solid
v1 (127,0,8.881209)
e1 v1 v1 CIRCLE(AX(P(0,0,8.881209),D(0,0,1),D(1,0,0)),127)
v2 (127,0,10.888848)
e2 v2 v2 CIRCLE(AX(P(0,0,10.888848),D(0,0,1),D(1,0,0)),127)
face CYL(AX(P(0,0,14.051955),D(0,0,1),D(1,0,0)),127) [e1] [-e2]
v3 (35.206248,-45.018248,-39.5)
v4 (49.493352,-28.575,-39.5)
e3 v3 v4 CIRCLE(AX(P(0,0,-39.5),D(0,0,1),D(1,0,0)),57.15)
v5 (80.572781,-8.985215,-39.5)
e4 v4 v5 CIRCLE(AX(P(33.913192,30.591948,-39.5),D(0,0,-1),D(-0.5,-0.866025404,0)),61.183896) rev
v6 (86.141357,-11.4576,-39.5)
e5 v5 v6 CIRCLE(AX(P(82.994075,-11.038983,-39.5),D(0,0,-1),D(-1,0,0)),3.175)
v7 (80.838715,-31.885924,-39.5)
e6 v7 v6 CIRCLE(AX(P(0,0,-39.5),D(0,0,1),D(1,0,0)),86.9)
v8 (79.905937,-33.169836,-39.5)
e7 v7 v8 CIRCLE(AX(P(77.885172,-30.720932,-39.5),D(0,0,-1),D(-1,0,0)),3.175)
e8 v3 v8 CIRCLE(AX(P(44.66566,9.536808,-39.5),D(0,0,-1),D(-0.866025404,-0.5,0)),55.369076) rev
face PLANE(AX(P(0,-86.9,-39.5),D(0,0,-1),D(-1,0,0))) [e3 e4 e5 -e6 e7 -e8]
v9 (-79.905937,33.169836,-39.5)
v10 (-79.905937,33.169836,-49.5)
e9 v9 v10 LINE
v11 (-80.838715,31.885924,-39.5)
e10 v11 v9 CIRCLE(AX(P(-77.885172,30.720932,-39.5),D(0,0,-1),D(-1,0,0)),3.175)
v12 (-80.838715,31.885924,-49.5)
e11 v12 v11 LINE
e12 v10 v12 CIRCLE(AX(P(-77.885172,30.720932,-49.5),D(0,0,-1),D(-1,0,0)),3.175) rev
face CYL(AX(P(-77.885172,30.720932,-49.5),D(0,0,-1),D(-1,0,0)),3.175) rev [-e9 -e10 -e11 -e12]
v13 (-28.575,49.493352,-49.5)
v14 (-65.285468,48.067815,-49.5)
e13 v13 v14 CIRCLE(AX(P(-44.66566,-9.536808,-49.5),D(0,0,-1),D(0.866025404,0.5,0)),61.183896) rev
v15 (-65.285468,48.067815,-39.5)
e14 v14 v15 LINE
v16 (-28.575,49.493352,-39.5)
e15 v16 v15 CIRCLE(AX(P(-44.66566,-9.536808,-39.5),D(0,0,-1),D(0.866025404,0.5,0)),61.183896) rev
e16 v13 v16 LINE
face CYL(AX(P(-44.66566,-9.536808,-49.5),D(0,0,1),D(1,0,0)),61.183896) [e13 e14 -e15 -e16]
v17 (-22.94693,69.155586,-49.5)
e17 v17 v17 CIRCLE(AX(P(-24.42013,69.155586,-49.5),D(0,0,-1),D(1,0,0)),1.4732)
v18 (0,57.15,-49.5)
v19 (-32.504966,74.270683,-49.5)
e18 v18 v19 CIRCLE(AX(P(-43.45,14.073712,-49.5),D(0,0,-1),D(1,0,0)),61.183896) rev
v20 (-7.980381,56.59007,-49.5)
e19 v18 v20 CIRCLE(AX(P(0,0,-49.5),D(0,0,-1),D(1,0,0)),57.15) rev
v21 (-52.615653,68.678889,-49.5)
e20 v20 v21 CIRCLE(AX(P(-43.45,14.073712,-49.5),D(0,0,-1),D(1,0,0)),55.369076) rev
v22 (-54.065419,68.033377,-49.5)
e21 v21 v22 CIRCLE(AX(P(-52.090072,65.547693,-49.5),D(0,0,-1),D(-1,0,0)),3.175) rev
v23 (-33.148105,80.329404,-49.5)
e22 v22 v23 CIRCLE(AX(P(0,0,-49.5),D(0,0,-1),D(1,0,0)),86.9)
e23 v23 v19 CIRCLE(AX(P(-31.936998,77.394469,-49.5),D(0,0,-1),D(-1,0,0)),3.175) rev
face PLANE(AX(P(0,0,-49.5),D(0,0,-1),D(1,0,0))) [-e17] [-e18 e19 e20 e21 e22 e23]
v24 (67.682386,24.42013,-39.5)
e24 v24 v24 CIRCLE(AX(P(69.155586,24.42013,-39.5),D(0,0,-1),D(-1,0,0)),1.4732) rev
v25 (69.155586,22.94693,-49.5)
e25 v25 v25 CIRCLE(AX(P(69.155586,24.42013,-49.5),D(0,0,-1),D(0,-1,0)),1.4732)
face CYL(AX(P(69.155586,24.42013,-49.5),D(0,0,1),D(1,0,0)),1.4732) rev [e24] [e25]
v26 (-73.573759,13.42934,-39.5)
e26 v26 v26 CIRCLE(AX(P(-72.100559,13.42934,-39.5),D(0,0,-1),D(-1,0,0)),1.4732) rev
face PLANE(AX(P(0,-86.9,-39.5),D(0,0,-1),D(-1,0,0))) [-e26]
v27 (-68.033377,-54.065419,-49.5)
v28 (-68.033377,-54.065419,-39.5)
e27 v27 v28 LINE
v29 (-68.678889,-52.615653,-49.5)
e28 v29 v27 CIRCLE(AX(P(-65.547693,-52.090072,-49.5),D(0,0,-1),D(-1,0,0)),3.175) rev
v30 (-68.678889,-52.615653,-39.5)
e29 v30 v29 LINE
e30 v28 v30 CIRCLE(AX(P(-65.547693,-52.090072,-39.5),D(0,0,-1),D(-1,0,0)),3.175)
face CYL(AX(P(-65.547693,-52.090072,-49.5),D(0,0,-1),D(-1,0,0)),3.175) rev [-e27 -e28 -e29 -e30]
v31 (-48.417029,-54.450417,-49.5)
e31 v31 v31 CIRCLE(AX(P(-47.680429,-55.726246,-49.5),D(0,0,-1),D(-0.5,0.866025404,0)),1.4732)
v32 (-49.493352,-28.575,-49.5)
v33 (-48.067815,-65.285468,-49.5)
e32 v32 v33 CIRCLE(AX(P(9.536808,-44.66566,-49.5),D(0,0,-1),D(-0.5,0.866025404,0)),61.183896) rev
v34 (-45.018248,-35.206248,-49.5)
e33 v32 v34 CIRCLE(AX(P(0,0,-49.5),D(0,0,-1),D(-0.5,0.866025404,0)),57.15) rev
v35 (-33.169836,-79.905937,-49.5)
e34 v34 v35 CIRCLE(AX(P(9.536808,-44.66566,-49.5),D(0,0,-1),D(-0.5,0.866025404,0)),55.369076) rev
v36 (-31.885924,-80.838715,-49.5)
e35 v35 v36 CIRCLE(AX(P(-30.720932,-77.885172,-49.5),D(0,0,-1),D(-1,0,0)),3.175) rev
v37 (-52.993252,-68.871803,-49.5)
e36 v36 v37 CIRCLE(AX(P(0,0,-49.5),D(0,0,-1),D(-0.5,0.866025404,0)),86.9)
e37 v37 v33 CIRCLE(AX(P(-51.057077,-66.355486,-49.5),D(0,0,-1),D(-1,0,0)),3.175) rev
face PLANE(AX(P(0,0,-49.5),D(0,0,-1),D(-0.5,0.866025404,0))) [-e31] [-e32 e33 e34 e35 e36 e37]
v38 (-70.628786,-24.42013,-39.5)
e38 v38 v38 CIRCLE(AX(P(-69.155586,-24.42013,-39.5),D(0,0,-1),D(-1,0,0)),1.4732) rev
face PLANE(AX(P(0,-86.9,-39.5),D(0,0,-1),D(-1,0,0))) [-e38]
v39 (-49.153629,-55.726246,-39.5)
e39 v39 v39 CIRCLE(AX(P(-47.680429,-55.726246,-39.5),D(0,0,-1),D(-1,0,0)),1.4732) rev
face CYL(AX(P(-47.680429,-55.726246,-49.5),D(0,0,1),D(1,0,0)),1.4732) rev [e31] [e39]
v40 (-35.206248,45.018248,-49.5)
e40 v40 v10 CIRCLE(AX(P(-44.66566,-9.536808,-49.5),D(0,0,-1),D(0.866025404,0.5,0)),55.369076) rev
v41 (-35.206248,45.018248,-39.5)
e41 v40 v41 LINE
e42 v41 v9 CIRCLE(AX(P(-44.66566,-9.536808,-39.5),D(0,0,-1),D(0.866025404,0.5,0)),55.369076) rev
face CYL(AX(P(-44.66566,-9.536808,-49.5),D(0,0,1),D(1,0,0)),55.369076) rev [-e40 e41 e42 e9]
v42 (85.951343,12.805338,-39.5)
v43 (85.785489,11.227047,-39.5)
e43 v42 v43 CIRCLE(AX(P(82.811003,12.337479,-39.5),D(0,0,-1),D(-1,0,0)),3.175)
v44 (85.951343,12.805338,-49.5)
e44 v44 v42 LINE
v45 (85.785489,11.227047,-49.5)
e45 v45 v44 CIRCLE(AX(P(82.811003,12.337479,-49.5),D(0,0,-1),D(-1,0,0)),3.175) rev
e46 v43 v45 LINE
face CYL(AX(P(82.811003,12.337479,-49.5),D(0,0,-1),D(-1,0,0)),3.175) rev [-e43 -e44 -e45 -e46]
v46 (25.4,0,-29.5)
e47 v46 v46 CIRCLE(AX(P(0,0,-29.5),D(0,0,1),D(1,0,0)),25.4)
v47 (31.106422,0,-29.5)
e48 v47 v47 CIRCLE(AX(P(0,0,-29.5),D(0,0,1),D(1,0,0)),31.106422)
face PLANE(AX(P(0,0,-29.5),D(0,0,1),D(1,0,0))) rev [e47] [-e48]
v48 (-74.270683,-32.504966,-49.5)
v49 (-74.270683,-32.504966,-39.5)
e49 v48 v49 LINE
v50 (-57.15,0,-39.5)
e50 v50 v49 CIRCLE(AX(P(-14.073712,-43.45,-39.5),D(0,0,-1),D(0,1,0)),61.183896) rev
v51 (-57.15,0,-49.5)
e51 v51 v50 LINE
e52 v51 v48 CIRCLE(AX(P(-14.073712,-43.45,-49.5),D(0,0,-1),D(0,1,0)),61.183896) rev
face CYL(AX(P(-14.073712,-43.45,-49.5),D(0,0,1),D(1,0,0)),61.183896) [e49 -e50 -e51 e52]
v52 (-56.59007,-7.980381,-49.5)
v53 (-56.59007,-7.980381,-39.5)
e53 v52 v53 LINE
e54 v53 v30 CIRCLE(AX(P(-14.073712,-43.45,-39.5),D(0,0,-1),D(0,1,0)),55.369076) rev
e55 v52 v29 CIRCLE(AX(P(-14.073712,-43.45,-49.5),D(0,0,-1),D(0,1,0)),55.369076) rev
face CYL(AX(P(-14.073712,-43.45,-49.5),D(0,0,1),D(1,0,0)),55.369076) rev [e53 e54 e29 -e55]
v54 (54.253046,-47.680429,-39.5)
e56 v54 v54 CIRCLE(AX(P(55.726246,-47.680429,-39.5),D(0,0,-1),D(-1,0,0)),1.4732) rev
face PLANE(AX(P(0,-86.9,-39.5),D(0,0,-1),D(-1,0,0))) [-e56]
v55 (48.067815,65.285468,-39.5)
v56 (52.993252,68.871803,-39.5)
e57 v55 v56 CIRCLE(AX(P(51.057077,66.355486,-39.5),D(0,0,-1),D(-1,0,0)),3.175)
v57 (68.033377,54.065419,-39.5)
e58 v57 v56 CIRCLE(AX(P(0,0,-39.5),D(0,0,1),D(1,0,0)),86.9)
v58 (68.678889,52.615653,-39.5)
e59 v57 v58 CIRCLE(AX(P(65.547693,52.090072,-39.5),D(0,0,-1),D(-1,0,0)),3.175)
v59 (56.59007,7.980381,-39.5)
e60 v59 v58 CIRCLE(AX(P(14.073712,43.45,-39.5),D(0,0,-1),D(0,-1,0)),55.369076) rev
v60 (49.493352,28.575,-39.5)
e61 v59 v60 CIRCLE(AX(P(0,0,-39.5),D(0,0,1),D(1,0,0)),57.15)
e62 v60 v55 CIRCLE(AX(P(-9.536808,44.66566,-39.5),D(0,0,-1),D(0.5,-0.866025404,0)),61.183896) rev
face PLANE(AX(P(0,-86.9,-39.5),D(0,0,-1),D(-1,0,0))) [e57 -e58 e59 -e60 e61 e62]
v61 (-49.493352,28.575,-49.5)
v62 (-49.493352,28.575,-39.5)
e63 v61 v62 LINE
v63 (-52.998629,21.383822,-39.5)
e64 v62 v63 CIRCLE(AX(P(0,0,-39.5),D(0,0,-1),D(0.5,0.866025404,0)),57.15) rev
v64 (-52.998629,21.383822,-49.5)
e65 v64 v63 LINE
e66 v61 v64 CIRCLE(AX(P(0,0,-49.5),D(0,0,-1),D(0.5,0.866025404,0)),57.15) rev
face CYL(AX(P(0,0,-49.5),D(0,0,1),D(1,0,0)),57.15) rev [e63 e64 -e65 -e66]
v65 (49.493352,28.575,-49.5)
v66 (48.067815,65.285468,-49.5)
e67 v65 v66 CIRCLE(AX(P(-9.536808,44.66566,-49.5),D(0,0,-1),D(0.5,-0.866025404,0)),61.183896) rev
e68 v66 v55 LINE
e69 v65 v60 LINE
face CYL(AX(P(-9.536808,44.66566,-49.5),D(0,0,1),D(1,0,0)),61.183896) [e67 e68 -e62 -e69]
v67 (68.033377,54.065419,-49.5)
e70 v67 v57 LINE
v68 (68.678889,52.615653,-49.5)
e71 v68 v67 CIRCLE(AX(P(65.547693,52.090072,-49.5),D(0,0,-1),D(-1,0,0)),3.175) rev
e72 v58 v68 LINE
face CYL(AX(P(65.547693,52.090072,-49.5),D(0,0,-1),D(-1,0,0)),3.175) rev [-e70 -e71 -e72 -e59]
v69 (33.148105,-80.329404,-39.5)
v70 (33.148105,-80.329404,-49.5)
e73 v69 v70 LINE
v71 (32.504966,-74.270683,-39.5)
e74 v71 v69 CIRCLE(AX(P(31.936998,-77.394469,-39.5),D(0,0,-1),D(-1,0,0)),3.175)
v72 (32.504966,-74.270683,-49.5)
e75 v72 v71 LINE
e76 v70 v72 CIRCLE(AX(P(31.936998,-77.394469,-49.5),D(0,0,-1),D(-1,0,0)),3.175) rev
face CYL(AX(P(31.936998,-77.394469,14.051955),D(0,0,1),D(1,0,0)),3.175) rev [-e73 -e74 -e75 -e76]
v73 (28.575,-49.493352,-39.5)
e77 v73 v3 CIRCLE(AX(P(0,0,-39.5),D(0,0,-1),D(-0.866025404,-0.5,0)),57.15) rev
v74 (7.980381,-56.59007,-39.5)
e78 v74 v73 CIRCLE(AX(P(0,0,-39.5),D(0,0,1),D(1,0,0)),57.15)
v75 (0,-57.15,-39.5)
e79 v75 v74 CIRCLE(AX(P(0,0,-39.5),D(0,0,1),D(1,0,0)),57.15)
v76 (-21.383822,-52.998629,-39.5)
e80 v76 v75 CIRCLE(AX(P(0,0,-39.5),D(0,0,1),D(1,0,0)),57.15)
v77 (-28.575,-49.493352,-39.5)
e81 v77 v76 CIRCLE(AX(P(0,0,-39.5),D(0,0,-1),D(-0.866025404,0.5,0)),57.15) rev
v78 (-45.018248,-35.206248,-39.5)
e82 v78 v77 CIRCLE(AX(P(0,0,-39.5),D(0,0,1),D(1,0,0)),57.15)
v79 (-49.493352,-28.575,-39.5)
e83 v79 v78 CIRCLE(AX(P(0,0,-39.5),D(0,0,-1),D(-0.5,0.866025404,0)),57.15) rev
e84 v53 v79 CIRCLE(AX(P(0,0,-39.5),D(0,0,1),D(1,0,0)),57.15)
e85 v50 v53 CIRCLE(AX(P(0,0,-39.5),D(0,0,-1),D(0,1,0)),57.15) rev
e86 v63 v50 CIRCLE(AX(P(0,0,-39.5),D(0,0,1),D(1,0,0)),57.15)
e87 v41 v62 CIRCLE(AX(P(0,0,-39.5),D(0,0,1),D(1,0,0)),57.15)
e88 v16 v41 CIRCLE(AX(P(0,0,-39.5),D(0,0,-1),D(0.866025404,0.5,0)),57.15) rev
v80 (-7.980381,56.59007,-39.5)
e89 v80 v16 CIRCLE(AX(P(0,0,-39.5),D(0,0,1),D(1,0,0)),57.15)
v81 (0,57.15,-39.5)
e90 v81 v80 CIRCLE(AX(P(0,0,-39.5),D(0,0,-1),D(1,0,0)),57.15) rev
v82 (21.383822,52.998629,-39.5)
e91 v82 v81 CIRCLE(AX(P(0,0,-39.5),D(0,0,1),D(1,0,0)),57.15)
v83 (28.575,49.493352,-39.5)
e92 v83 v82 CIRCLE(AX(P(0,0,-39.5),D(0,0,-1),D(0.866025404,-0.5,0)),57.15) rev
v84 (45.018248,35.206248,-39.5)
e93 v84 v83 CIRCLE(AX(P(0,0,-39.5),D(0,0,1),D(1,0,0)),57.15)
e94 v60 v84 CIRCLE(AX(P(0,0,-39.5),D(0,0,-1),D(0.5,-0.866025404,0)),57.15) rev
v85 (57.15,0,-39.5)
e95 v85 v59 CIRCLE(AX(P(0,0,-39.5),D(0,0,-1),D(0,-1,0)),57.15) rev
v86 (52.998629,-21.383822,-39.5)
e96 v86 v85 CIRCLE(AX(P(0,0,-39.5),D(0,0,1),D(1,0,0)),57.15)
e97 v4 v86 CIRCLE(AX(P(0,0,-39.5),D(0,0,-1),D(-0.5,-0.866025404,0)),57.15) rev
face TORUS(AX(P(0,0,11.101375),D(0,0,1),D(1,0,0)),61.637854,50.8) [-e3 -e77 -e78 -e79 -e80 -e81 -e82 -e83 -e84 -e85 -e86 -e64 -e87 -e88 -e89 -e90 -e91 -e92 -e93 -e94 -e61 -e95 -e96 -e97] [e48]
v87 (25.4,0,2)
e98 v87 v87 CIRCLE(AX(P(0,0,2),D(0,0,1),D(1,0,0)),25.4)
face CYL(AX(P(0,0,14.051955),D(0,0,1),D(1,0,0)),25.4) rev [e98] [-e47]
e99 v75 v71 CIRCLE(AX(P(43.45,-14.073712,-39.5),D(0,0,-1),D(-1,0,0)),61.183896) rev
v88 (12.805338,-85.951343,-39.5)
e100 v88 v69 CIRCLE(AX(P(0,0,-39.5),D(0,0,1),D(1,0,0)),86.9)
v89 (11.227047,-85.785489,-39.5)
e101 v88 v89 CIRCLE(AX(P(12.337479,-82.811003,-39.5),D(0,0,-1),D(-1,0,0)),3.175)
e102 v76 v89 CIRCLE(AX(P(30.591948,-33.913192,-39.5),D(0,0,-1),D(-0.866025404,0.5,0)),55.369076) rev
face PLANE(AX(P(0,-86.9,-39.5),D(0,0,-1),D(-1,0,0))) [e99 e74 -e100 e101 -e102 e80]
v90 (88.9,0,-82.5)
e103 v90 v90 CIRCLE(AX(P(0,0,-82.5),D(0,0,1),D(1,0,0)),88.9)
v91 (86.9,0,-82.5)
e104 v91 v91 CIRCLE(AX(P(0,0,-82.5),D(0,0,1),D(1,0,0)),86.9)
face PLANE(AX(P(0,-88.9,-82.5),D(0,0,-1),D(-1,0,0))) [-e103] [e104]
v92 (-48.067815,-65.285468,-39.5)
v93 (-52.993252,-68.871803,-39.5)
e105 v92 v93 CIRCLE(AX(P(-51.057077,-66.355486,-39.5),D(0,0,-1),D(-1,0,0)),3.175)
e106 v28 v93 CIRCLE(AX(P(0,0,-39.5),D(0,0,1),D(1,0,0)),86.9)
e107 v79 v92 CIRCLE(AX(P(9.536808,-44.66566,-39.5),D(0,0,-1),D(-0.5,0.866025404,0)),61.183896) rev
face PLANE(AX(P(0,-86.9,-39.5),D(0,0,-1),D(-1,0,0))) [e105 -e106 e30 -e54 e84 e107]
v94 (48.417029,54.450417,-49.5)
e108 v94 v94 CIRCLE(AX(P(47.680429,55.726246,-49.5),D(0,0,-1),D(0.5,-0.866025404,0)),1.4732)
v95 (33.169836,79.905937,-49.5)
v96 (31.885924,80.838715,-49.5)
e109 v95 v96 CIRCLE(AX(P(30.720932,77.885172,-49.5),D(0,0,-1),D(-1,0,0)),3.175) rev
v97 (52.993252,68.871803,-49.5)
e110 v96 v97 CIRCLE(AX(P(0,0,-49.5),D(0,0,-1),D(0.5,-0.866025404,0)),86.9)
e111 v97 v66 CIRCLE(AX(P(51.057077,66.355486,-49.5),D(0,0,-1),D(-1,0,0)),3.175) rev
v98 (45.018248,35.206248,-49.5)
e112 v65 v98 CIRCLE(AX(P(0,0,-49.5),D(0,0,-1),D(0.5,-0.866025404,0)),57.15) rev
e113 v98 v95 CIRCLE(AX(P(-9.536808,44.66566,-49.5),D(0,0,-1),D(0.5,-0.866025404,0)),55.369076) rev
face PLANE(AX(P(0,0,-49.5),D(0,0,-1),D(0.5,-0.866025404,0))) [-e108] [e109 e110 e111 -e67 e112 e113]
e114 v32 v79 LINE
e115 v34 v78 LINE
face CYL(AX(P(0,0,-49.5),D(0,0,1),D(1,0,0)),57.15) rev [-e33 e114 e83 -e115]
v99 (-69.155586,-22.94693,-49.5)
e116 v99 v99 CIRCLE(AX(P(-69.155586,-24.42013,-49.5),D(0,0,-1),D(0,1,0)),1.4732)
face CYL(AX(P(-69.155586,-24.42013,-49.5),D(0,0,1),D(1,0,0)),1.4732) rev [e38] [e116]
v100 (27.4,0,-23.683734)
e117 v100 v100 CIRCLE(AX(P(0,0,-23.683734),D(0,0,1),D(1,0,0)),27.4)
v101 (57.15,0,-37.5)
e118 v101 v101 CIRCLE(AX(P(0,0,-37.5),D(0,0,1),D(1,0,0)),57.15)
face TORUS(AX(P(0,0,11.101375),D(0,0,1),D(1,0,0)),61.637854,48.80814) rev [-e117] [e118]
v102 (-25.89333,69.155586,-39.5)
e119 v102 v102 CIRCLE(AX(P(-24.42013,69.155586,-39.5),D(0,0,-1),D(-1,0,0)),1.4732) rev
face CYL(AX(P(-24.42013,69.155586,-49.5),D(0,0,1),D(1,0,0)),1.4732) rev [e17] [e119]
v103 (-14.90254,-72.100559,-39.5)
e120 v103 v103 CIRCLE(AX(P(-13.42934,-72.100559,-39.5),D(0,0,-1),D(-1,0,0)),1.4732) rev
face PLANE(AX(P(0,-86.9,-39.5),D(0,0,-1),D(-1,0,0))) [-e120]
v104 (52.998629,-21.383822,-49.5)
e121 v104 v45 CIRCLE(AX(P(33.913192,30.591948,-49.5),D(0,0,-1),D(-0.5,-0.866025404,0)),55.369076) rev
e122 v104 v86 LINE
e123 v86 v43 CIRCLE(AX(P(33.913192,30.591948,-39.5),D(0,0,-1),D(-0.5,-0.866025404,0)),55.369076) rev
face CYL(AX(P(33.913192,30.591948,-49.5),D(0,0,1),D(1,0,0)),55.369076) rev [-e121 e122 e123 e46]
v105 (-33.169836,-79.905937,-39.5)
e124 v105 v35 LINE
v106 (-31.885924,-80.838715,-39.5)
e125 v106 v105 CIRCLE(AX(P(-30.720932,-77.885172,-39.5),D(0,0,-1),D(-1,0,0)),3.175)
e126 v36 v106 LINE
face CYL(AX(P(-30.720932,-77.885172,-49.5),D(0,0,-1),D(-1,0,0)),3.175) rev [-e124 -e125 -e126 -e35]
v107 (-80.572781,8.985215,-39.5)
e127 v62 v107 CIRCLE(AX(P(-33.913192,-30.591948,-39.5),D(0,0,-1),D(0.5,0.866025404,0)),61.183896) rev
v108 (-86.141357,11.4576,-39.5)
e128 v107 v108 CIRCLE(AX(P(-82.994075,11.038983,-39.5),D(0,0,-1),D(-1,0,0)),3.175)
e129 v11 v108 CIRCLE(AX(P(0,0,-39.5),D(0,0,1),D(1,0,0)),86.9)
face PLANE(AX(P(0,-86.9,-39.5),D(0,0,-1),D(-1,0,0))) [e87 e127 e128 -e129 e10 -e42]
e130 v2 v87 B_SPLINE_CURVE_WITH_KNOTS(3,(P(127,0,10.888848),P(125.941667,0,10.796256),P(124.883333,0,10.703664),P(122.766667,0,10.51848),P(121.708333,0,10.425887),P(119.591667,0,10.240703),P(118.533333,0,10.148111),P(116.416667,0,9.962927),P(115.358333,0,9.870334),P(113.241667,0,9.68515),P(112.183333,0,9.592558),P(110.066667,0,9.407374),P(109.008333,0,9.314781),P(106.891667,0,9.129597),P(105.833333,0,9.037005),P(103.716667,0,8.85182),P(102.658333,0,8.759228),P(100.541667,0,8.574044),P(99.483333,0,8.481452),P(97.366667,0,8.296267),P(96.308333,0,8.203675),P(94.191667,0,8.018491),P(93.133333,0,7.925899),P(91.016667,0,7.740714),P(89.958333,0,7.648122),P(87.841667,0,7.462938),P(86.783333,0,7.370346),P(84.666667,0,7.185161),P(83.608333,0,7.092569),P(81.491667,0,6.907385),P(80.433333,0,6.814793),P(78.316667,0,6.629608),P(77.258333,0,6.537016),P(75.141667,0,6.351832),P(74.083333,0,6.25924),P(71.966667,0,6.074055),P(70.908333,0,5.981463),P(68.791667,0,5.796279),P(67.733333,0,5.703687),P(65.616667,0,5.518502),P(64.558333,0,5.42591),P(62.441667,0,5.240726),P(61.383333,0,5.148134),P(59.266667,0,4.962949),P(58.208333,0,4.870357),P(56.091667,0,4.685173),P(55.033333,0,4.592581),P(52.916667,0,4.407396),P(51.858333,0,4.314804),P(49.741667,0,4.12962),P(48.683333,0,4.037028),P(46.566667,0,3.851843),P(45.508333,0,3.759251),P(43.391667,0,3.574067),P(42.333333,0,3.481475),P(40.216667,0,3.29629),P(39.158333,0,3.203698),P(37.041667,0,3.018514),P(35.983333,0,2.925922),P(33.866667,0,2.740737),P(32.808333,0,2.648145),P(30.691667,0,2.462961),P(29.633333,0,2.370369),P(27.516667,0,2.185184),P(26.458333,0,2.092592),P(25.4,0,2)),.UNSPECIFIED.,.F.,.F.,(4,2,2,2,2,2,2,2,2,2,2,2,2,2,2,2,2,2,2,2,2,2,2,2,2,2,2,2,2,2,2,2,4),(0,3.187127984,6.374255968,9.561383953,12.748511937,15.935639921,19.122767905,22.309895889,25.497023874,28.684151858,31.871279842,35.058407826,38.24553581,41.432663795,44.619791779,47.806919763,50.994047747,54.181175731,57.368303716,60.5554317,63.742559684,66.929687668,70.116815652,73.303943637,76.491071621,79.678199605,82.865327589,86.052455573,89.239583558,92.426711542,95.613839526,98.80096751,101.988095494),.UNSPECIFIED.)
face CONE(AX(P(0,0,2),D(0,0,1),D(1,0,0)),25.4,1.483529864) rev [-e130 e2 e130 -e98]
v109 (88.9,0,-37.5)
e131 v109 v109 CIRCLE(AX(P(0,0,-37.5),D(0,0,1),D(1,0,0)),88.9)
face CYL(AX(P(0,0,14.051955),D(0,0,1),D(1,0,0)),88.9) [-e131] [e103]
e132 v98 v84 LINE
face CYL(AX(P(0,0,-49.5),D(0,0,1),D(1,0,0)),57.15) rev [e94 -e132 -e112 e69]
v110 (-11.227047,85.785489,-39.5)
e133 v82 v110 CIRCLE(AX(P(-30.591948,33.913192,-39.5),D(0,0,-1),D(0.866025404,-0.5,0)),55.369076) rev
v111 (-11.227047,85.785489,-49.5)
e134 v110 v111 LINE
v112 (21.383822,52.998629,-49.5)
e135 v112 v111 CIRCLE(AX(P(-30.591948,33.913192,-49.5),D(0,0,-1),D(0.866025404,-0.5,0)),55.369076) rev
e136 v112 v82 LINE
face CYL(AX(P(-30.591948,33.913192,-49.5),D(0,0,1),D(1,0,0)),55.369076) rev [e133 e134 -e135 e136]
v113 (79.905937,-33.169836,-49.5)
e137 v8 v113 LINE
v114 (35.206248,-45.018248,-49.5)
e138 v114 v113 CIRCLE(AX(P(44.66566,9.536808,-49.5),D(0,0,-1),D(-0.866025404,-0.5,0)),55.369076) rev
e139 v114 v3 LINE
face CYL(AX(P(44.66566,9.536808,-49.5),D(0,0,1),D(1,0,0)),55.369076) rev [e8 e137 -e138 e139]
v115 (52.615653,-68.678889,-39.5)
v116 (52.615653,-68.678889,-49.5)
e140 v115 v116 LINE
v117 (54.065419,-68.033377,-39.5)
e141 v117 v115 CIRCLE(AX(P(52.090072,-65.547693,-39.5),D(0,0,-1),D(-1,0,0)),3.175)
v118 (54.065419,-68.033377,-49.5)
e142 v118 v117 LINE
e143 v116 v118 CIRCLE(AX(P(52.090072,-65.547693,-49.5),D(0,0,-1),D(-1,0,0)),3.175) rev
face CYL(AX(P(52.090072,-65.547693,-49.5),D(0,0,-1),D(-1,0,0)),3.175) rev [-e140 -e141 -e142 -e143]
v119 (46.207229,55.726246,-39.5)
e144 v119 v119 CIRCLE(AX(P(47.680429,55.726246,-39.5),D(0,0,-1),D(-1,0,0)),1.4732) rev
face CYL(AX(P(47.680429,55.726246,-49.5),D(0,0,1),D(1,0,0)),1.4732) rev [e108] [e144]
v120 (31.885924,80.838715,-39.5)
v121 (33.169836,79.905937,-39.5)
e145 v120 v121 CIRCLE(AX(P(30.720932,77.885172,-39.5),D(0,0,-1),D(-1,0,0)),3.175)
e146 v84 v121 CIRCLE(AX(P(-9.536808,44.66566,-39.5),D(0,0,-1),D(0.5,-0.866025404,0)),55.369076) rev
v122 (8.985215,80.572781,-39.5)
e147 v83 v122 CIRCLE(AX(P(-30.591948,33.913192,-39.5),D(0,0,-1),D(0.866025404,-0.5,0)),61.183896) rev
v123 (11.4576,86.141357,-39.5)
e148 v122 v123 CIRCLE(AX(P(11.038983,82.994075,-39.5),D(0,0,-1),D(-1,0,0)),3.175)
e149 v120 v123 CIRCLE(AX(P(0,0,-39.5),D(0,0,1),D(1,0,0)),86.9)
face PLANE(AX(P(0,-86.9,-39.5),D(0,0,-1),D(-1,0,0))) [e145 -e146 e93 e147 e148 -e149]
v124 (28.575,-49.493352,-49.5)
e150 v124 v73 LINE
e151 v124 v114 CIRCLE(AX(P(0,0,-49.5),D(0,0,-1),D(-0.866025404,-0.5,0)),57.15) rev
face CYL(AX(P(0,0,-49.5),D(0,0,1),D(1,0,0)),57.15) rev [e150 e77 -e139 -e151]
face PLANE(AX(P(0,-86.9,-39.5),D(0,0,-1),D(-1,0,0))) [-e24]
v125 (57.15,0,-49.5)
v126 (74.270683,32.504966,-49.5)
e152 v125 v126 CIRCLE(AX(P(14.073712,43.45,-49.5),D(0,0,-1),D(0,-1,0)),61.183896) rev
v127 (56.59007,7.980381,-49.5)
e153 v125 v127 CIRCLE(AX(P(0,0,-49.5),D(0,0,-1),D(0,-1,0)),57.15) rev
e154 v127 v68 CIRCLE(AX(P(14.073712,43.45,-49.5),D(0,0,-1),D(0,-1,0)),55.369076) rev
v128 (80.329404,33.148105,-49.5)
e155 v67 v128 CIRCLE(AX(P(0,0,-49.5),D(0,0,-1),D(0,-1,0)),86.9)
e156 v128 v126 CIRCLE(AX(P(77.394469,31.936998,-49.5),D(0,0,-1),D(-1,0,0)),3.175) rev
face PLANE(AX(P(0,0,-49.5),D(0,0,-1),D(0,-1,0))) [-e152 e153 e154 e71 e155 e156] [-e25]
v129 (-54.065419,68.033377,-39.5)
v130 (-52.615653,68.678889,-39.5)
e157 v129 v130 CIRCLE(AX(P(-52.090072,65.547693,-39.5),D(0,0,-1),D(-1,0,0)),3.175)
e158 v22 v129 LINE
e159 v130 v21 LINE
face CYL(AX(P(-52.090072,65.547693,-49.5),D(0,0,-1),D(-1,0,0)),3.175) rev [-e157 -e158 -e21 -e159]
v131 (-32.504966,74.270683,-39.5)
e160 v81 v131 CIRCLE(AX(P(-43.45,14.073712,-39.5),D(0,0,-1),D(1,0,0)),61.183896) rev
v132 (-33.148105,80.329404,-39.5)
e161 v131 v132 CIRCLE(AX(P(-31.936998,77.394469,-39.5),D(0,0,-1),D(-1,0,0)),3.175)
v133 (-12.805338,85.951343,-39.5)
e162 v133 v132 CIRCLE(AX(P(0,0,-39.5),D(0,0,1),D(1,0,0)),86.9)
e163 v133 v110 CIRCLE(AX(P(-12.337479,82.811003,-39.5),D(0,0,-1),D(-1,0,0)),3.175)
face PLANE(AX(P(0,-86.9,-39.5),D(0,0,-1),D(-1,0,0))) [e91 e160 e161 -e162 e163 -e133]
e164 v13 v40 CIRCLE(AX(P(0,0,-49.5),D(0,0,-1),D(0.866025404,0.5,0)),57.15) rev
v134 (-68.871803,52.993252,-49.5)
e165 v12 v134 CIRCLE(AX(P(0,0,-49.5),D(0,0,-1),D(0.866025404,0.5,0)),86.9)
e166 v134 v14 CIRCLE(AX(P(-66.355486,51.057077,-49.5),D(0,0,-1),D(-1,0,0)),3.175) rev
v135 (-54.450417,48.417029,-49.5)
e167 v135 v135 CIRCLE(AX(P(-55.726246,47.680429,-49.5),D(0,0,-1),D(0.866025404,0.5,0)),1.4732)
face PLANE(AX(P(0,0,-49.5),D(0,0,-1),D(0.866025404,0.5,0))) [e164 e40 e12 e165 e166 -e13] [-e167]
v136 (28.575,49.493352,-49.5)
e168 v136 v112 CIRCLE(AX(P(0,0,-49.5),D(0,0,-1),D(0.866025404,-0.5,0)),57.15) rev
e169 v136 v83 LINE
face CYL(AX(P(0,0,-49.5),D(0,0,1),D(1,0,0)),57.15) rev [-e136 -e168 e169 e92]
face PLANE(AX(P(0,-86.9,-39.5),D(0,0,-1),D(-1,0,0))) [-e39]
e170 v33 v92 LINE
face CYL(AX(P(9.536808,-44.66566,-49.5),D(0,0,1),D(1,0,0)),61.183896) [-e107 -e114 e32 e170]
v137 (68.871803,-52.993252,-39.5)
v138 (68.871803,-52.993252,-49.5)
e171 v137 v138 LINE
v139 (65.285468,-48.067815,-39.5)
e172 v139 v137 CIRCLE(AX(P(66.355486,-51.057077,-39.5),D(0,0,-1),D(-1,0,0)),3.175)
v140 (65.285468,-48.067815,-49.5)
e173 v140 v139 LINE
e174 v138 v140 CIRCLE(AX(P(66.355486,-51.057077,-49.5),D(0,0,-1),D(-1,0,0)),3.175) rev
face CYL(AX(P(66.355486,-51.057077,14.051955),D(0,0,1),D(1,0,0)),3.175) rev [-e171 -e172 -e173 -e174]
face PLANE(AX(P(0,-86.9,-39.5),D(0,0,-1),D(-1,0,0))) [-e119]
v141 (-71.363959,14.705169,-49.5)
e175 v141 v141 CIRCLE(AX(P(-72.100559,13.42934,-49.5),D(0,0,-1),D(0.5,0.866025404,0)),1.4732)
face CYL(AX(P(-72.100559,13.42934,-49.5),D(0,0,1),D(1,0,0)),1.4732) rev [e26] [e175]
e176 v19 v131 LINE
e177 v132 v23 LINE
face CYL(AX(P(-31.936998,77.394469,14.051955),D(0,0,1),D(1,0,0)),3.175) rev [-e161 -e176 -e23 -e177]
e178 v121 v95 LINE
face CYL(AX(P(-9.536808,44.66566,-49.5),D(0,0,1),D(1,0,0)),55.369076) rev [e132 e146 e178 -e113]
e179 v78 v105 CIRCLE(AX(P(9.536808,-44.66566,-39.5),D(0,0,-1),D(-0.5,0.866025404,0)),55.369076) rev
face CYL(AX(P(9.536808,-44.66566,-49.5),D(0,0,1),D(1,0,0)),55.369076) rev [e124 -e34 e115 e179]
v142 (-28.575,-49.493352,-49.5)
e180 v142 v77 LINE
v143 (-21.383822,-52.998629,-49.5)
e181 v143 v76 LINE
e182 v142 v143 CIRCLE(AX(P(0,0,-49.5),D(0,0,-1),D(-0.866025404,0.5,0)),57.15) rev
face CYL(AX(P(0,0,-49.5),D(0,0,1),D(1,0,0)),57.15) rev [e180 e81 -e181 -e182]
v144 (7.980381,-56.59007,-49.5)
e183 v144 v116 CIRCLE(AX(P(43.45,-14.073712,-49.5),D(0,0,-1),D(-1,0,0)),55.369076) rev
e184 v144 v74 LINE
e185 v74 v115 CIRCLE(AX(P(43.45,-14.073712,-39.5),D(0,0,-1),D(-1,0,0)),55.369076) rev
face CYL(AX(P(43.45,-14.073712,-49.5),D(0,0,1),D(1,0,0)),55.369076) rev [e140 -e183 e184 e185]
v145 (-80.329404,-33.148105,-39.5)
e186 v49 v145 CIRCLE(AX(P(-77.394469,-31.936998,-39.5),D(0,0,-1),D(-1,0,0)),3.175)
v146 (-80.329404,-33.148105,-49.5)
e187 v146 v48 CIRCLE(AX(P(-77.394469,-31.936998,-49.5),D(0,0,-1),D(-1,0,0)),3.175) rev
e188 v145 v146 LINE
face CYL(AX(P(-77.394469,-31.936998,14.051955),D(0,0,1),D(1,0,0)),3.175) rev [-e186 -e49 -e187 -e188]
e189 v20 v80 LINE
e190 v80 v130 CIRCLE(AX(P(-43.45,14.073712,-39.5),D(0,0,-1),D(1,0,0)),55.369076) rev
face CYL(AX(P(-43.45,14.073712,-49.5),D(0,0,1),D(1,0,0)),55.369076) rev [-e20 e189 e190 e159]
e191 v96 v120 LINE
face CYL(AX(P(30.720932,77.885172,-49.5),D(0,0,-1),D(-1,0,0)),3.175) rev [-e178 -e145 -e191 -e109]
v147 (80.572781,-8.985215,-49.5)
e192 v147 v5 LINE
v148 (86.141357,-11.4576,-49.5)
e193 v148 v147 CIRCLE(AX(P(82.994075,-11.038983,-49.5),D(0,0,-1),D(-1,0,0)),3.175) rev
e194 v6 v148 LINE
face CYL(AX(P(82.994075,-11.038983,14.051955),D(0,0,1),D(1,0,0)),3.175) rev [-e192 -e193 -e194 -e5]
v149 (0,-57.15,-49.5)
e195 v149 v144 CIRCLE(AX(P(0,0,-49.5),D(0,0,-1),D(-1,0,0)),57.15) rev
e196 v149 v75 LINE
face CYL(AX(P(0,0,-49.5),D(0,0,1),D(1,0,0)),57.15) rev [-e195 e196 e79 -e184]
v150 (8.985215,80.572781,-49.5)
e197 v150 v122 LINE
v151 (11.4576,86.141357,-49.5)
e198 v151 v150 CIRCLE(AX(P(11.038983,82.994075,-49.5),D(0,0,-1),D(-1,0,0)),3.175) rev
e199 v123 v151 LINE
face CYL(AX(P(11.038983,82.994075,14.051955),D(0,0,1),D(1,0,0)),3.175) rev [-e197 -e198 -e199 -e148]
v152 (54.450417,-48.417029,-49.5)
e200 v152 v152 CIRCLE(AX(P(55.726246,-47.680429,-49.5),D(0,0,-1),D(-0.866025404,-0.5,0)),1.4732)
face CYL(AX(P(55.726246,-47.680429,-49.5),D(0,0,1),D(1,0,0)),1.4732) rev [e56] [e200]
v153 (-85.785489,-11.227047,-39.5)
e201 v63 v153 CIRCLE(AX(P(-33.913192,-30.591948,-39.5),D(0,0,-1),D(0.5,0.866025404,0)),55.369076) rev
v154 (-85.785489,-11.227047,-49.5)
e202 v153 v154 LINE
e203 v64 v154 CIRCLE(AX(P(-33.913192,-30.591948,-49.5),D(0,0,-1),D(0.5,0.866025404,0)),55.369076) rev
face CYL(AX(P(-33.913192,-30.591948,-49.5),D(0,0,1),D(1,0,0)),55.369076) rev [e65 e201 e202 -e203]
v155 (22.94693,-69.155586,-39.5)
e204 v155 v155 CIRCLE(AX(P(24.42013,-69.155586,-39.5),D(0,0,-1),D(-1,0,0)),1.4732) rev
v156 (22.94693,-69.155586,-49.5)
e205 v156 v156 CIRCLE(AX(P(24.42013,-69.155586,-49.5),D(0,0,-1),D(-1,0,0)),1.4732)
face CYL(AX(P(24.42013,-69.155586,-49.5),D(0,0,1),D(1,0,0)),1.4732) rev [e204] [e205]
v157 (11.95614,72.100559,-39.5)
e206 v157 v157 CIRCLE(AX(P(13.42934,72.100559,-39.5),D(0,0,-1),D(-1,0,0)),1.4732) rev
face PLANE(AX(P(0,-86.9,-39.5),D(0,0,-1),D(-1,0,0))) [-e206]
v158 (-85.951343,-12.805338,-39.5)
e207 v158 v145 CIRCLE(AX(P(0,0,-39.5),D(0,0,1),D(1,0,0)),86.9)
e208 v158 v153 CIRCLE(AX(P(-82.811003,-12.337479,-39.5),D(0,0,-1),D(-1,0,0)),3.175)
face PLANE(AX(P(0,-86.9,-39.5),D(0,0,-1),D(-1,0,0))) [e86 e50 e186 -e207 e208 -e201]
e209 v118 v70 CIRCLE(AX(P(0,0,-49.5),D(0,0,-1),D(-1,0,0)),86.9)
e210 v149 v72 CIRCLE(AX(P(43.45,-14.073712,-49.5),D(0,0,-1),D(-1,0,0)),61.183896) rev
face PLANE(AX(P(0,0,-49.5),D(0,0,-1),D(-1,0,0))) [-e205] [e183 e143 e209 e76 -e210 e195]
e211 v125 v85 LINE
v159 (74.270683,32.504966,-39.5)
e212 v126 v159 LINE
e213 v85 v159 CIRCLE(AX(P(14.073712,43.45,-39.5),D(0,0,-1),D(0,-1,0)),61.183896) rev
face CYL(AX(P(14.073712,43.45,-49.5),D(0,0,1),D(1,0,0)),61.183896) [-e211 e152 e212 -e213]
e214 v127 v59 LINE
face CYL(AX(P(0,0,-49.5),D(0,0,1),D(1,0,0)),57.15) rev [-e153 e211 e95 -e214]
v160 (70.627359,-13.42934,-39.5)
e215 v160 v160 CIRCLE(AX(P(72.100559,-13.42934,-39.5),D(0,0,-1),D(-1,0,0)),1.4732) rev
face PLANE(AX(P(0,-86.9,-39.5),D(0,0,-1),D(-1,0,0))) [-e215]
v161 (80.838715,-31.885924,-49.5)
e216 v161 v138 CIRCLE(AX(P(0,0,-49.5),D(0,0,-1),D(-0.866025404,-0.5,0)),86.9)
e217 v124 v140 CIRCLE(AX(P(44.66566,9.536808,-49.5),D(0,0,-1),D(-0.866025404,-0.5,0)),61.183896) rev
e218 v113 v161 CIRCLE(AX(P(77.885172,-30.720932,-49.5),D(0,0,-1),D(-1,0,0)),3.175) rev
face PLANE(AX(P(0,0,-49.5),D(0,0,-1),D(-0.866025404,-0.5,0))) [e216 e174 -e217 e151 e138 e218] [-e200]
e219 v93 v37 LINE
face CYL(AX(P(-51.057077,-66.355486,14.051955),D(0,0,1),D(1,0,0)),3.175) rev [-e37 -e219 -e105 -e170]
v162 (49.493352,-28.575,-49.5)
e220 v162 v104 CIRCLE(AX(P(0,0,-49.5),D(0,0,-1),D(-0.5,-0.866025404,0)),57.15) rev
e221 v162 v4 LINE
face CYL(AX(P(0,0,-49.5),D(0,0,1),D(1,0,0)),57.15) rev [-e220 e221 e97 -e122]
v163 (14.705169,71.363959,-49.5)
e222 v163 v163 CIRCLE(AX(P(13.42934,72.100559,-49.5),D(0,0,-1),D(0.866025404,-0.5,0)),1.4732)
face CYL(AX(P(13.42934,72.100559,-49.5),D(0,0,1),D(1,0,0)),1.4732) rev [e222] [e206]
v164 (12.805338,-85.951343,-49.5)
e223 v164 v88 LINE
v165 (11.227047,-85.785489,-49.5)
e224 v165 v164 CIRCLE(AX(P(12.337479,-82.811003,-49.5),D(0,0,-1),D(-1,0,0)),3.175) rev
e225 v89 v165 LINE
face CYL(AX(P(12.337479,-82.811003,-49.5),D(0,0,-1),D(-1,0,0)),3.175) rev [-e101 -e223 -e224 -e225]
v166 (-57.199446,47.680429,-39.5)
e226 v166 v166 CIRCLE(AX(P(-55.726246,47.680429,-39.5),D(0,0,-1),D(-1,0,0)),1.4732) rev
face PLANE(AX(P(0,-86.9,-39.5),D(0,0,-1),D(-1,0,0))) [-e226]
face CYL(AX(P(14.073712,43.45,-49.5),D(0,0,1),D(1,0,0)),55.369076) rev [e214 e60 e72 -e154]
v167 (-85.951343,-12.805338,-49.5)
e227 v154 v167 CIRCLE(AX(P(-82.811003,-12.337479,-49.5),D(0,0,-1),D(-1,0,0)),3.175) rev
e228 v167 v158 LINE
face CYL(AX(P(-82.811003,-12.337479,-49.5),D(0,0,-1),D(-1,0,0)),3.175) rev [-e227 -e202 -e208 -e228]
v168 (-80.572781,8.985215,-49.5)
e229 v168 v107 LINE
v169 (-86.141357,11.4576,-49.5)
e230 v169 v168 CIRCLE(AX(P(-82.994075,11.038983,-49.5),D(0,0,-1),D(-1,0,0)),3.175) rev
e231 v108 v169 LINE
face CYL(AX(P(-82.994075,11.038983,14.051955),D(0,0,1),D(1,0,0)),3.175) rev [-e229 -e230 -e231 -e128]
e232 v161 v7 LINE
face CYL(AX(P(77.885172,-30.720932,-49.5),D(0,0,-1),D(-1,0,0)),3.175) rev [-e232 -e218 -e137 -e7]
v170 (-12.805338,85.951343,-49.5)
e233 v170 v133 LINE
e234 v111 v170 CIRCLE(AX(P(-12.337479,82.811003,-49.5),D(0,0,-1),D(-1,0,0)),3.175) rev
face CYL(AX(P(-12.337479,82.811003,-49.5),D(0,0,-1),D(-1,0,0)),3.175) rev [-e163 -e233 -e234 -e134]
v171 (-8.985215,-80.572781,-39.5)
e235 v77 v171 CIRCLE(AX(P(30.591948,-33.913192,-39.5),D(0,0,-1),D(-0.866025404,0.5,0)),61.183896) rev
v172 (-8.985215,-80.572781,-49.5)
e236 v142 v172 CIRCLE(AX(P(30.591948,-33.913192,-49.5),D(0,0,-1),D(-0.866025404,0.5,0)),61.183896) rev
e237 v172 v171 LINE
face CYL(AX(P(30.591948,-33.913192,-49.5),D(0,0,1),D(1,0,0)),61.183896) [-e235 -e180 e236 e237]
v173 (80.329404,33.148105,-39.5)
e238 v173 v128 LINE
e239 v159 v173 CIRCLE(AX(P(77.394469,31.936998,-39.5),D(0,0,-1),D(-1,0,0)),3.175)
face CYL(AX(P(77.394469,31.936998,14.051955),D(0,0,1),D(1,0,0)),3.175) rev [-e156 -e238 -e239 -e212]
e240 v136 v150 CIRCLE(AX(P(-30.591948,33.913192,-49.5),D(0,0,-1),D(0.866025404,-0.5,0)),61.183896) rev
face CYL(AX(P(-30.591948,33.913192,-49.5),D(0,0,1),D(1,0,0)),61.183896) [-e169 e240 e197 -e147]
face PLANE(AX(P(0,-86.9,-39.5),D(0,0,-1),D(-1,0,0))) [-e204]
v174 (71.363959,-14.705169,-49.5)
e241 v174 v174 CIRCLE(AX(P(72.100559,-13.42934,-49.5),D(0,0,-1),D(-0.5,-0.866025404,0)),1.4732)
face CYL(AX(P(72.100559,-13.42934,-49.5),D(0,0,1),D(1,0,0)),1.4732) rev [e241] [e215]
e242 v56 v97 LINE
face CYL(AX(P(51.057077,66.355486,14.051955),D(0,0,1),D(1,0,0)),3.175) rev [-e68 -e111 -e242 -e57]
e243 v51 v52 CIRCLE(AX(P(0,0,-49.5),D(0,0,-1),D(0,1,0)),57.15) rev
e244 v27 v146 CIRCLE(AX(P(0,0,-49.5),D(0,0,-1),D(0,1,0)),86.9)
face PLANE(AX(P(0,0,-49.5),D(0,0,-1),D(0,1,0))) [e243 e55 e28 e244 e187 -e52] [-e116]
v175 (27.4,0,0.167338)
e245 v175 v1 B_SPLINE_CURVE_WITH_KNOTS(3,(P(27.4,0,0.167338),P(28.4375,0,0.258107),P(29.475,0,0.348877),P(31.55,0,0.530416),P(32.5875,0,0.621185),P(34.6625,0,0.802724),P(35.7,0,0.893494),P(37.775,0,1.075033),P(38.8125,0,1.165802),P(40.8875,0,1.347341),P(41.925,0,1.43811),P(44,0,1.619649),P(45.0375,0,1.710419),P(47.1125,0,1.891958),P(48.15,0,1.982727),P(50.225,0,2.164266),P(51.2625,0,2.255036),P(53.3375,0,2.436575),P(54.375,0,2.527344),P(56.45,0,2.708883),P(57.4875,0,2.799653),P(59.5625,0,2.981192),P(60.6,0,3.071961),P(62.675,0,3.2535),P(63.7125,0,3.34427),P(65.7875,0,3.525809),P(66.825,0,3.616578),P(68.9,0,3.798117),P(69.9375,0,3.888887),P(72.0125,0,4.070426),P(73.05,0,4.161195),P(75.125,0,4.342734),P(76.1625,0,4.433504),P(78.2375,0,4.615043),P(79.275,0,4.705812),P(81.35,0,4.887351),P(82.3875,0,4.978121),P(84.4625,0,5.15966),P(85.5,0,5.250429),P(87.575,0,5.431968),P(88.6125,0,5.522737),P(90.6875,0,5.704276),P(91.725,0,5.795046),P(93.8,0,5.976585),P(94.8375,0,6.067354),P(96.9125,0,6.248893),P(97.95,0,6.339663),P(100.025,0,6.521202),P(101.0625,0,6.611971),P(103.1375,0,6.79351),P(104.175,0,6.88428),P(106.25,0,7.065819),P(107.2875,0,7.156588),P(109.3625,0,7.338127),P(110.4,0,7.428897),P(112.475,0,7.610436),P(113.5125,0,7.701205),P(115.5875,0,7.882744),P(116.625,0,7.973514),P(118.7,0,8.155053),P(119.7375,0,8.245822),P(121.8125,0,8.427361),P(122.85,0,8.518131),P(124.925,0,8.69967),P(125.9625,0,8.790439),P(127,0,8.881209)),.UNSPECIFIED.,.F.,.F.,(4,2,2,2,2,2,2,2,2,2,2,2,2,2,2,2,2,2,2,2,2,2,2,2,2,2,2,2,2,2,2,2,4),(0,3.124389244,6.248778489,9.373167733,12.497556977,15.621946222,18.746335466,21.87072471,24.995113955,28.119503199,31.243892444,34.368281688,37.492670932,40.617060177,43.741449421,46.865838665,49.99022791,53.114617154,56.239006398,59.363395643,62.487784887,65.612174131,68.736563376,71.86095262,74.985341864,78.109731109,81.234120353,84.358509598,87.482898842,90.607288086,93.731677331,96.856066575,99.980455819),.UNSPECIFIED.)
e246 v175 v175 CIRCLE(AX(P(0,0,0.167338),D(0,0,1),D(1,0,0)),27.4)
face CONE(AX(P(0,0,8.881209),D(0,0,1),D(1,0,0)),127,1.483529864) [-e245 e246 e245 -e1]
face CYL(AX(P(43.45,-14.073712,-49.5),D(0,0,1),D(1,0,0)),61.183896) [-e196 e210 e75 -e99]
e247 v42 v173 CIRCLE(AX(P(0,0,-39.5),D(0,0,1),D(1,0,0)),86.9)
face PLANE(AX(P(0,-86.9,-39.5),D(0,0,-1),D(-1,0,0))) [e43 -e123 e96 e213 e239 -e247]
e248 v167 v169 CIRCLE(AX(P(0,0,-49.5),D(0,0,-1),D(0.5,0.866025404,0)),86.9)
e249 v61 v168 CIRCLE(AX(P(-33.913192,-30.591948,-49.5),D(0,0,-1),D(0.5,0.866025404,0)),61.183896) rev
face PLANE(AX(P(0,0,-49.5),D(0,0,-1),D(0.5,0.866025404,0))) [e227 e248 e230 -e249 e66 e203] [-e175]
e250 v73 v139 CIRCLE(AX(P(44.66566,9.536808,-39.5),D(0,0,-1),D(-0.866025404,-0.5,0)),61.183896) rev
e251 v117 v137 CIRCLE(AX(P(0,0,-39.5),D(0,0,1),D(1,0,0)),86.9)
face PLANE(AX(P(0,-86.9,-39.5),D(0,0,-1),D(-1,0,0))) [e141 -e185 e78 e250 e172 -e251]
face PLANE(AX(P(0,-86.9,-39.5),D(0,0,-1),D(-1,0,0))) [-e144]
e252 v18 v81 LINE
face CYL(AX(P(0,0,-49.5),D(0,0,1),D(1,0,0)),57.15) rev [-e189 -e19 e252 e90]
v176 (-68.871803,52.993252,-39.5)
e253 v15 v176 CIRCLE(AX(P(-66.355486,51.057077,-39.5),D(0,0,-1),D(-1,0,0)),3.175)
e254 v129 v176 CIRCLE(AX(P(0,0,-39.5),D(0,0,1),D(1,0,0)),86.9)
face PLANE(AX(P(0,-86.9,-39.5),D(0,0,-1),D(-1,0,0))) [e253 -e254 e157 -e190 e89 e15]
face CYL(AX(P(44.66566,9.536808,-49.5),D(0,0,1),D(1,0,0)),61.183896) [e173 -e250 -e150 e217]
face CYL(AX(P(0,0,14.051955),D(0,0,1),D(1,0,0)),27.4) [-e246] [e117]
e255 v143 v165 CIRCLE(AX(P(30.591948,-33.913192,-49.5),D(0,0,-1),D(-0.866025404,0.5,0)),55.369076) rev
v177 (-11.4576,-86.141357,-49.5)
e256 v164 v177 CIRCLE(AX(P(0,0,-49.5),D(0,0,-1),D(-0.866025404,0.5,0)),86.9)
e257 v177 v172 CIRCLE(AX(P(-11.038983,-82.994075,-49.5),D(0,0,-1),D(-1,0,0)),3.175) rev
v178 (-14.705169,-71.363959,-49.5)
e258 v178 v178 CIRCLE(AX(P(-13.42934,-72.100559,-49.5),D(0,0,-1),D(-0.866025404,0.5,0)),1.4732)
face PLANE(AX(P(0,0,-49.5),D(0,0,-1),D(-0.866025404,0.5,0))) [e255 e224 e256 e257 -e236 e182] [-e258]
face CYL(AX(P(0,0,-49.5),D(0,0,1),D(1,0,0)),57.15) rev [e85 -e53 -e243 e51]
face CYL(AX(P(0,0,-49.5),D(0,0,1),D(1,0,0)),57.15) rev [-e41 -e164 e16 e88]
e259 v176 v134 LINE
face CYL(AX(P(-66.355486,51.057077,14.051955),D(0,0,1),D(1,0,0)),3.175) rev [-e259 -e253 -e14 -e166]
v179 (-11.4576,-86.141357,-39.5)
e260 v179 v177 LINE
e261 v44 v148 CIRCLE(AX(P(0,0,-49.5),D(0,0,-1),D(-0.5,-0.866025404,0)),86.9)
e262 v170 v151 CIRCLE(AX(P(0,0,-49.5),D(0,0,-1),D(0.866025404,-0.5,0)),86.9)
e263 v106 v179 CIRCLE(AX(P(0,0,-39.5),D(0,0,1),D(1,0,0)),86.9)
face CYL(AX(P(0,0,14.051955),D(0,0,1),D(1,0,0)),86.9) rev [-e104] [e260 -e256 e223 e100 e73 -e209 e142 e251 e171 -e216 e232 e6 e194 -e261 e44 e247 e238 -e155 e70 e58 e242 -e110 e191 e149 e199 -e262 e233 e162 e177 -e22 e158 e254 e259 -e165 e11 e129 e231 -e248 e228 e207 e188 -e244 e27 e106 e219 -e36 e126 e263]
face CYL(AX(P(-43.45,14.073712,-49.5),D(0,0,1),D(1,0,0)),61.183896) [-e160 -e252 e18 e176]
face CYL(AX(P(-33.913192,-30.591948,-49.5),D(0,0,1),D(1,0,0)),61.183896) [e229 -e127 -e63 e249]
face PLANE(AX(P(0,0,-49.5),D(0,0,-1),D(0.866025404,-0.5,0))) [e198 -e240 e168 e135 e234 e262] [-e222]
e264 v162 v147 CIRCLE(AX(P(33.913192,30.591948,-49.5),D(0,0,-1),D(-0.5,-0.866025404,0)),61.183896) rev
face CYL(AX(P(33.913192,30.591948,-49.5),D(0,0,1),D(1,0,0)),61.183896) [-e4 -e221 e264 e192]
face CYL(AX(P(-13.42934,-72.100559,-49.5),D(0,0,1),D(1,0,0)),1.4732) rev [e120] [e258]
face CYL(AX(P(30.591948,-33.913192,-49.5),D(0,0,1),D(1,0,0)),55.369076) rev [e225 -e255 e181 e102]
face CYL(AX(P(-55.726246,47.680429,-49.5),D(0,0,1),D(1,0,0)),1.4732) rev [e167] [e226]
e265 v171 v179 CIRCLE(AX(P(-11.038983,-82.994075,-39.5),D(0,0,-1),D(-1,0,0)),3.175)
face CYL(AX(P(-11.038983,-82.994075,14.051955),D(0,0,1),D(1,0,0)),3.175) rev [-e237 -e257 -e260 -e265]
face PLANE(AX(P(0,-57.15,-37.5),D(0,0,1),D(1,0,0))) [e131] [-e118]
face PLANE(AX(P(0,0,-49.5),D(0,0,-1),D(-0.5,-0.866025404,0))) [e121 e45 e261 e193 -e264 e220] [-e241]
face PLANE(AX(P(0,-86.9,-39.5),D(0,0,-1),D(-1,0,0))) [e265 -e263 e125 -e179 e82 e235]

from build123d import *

# Parameters (mm, degrees)
SKETCH2_R             = 1.4732
BOSS_EXTRUDE1_DEPTH   = 10
FILLET2_R             = 3.175
CIRPATTERN2_START     = -49.5
CIRPATTERN2_OUTLINE_R = 1.4732
CIRPATTERN2_DEPTH     = 10


# Read off the part's stored shape, not the designer's step: CirPattern2
with BuildPart() as part:
    # Sketch1 → Revolve1 (revolve)
    with BuildSketch(Plane.YZ, mode=Mode.PRIVATE) as revolve1_sk:
        with BuildLine():
            ThreePointArc((-57.15, -39.5), (-43.428307314, -36.322800112), (-31.106422396, -29.5))
            Line((-31.106422396, -29.5), (-25.4, -29.5))
            Line((-25.4, -29.5), (-25.4, 2))
            Line((-25.4, 2), (-127, 10.888848214))
            Line((-127, 10.888848214), (-127, 8.881208539))
            Line((-127, 8.881208539), (-27.4, 0.167337652))
            Line((-27.4, 0.167337652), (-27.4, -23.683734158))
            ThreePointArc((-27.4, -23.683734158), (-41.079585236, -33.165904784), (-57.15, -37.5))
            Line((-57.15, -37.5), (-88.9, -37.5))
            Line((-88.9, -37.5), (-88.9, -82.5))
            Line((-88.9, -82.5), (-86.9, -82.5))
            Line((-86.9, -82.5), (-86.9, -39.5))
            Line((-86.9, -39.5), (-57.15, -39.5))
        make_face()
    revolve(revolve1_sk.sketch.rotate(Axis((0, 0, 14.051954895), (0, 0, -1)), 270), axis=Axis((0, 0, 14.051954895), (0, 0, -1)))

    # Sketch2 → Boss-Extrude1 (add)
    with BuildSketch(Plane(origin=(0, 0, -39.5), x_dir=(1, 0, 0), z_dir=(0, 0, -1))):
        with BuildLine():
            ThreePointArc((0, 57.15), (4, 57.009845641), (7.980380842, 56.590069991))
            ThreePointArc((7.980380842, 56.590069991), (29.37299875, 67.623432921), (53.425964916, 68.536678303))
            ThreePointArc((53.425964916, 68.536678303), (48.554411409, 72.069959989), (43.45, 75.257607589))
            ThreePointArc((43.45, 75.257607589), (19.913921564, 70.549566075), (0, 57.15))
        make_face()
        with Locations(Location((24.420129862, 69.15558596, 0), (0, 0, 180))):
            Circle(SKETCH2_R, mode=Mode.SUBTRACT)
    extrude(amount=BOSS_EXTRUDE1_DEPTH)

    # Fillet2
    fillet2_edges = [part.edges().sort_by_distance(p)[0] for p in [
        (53.425964916, -68.536678303, -44.5),
        (43.45, -75.257607589, -44.5),
    ]]
    fillet(fillet2_edges, radius=FILLET2_R)

    # CirPattern2 outline → CirPattern2 (add)
    # profile 1 of 11: a face of its own
    with BuildSketch(Plane.XY.offset(CIRPATTERN2_START)):
        with BuildLine():
            ThreePointArc((-21.383822454, -52.998628635), (-25.040821205, -51.371974591), (-28.575, -49.493351826))
            ThreePointArc((-28.575, -49.493351826), (-21.167907198, -66.538128805), (-8.985215302, -80.572781069))
            ThreePointArc((-8.985215302, -80.572781069), (-8.137140536, -84.282460346), (-11.457600483, -86.141357031))
            ThreePointArc((-11.457600483, -86.141357031), (0.680533064, -86.897335257), (12.805337694, -85.951342785))
            ThreePointArc((12.805337694, -85.951342785), (12.005662981, -85.968616711), (11.227047319, -85.785489194))
            ThreePointArc((11.227047319, -85.785489194), (-8.665120108, -72.959538869), (-21.383822454, -52.998628635))
        make_face()
        with Locations((-13.429340156, -72.100559186)):
            Circle(CIRPATTERN2_OUTLINE_R, mode=Mode.SUBTRACT)
    # profile 2 of 11: a face of its own
    with BuildSketch(Plane.XY.offset(CIRPATTERN2_START)):
        with BuildLine():
            ThreePointArc((-52.9932516, -68.871803264), (-42.859308707, -75.595566386), (-31.885923645, -80.838715188))
            ThreePointArc((-31.885923645, -80.838715188), (-32.587099225, -80.45383749), (-33.169836409, -79.905936578))
            ThreePointArc((-33.169836409, -79.905936578), (-43.983983575, -58.852254055), (-45.018247793, -35.206247537))
            ThreePointArc((-45.018247793, -35.206247537), (-47.371974591, -31.969024436), (-49.493351826, -28.575))
            ThreePointArc((-49.493351826, -28.575), (-51.601009781, -47.039756266), (-48.067815244, -65.285467609))
            ThreePointArc((-48.067815244, -65.285467609), (-49.188200591, -68.922181485), (-52.9932516, -68.871803264))
        make_face()
        with Locations((-47.680429324, -55.726245805)):
            Circle(CIRPATTERN2_OUTLINE_R, mode=Mode.SUBTRACT)
    # profile 3 of 11: a face of its own
    with BuildSketch(Plane.XY.offset(CIRPATTERN2_START)):
        with BuildLine():
            ThreePointArc((65.285467609, -48.067815244), (68.922181485, -49.188200591), (68.871803264, -52.9932516))
            ThreePointArc((68.871803264, -52.9932516), (75.595566386, -42.859308707), (80.838715188, -31.885923645))
            ThreePointArc((80.838715188, -31.885923645), (80.45383749, -32.587099225), (79.905936578, -33.169836409))
            ThreePointArc((79.905936578, -33.169836409), (58.852254055, -43.983983575), (35.206247537, -45.018247793))
            ThreePointArc((35.206247537, -45.018247793), (31.969024436, -47.371974591), (28.575, -49.493351826))
            ThreePointArc((28.575, -49.493351826), (47.039756266, -51.601009781), (65.285467609, -48.067815244))
        make_face()
        with Locations((55.726245805, -47.680429324)):
            Circle(CIRPATTERN2_OUTLINE_R, mode=Mode.SUBTRACT)
    # profile 4 of 11: a face of its own
    with BuildSketch(Plane.XY.offset(CIRPATTERN2_START)):
        with BuildLine():
            ThreePointArc((-80.329403747, -33.148105431), (-74.915033322, -44.03802655), (-68.033377494, -54.06541914))
            ThreePointArc((-68.033377494, -54.06541914), (-68.448174509, -53.381517486), (-68.678889259, -52.615652785))
            ThreePointArc((-68.678889259, -52.615652785), (-67.517374163, -28.975555294), (-56.590069991, -7.980380842))
            ThreePointArc((-56.590069991, -7.980380842), (-57.009845641, -4), (-57.15, 0))
            ThreePointArc((-57.15, 0), (-68.207663464, -14.937119024), (-74.27068291, -32.504965825))
            ThreePointArc((-74.27068291, -32.504965825), (-77.059322021, -35.094259755), (-80.329403747, -33.148105431))
        make_face()
        with Locations((-69.15558596, -24.420129862)):
            Circle(CIRPATTERN2_OUTLINE_R, mode=Mode.SUBTRACT)
    # profile 5 of 11: a face of its own
    with BuildSketch(Plane.XY.offset(CIRPATTERN2_START)):
        with BuildLine():
            ThreePointArc((80.572781069, -8.985215302), (84.282460346, -8.137140536), (86.141357031, -11.457600483))
            ThreePointArc((86.141357031, -11.457600483), (86.897335257, 0.680533064), (85.951342785, 12.805337694))
            ThreePointArc((85.951342785, 12.805337694), (85.968616711, 12.005662981), (85.785489194, 11.227047319))
            ThreePointArc((85.785489194, 11.227047319), (72.959538869, -8.665120108), (52.998628635, -21.383822454))
            ThreePointArc((52.998628635, -21.383822454), (51.371974591, -25.040821205), (49.493351826, -28.575))
            ThreePointArc((49.493351826, -28.575), (66.538128805, -21.167907198), (80.572781069, -8.985215302))
        make_face()
        with Locations((72.100559186, -13.429340156)):
            Circle(CIRPATTERN2_OUTLINE_R, mode=Mode.SUBTRACT)
    # profile 6 of 11: a face of its own
    with BuildSketch(Plane.XY.offset(CIRPATTERN2_START)):
        with BuildLine():
            ThreePointArc((-86.141357031, 11.457600483), (-86.897335257, -0.680533064), (-85.951342785, -12.805337694))
            ThreePointArc((-85.951342785, -12.805337694), (-85.968616711, -12.005662981), (-85.785489194, -11.227047319))
            ThreePointArc((-85.785489194, -11.227047319), (-72.959538869, 8.665120108), (-52.998628635, 21.383822454))
            ThreePointArc((-52.998628635, 21.383822454), (-51.371974591, 25.040821205), (-49.493351826, 28.575))
            ThreePointArc((-49.493351826, 28.575), (-66.538128805, 21.167907198), (-80.572781069, 8.985215302))
            ThreePointArc((-80.572781069, 8.985215302), (-84.282460346, 8.137140536), (-86.141357031, 11.457600483))
        make_face()
        with Locations((-72.100559186, 13.429340156)):
            Circle(CIRPATTERN2_OUTLINE_R, mode=Mode.SUBTRACT)
    # profile 7 of 11: a face of its own
    with BuildSketch(Plane.XY.offset(CIRPATTERN2_START)):
        with BuildLine():
            ThreePointArc((74.27068291, 32.504965825), (77.059322021, 35.094259755), (80.329403747, 33.148105431))
            ThreePointArc((80.329403747, 33.148105431), (74.915033322, 44.03802655), (68.033377494, 54.06541914))
            ThreePointArc((68.033377494, 54.06541914), (68.448174509, 53.381517486), (68.678889259, 52.615652785))
            ThreePointArc((68.678889259, 52.615652785), (67.517374163, 28.975555294), (56.590069991, 7.980380842))
            ThreePointArc((56.590069991, 7.980380842), (57.009845641, 4), (57.15, 0))
            ThreePointArc((57.15, 0), (68.207663464, 14.937119024), (74.27068291, 32.504965825))
        make_face()
        with Locations((69.15558596, 24.420129862)):
            Circle(CIRPATTERN2_OUTLINE_R, mode=Mode.SUBTRACT)
    # profile 8 of 11: a face of its own
    with BuildSketch(Plane.XY.offset(CIRPATTERN2_START)):
        with BuildLine():
            ThreePointArc((-68.871803264, 52.9932516), (-75.595566386, 42.859308707), (-80.838715188, 31.885923645))
            ThreePointArc((-80.838715188, 31.885923645), (-80.45383749, 32.587099225), (-79.905936578, 33.169836409))
            ThreePointArc((-79.905936578, 33.169836409), (-58.852254055, 43.983983575), (-35.206247537, 45.018247793))
            ThreePointArc((-35.206247537, 45.018247793), (-31.969024436, 47.371974591), (-28.575, 49.493351826))
            ThreePointArc((-28.575, 49.493351826), (-47.039756266, 51.601009781), (-65.285467609, 48.067815244))
            ThreePointArc((-65.285467609, 48.067815244), (-68.922181485, 49.188200591), (-68.871803264, 52.9932516))
        make_face()
        with Locations((-55.726245805, 47.680429324)):
            Circle(CIRPATTERN2_OUTLINE_R, mode=Mode.SUBTRACT)
    # profile 9 of 11: a face of its own
    with BuildSketch(Plane.XY.offset(CIRPATTERN2_START)):
        with BuildLine():
            ThreePointArc((48.067815244, 65.285467609), (49.188200591, 68.922181485), (52.9932516, 68.871803264))
            ThreePointArc((52.9932516, 68.871803264), (42.859308707, 75.595566386), (31.885923645, 80.838715188))
            ThreePointArc((31.885923645, 80.838715188), (32.587099225, 80.45383749), (33.169836409, 79.905936578))
            ThreePointArc((33.169836409, 79.905936578), (43.983983575, 58.852254055), (45.018247793, 35.206247537))
            ThreePointArc((45.018247793, 35.206247537), (47.371974591, 31.969024436), (49.493351826, 28.575))
            ThreePointArc((49.493351826, 28.575), (51.601009781, 47.039756266), (48.067815244, 65.285467609))
        make_face()
        with Locations((47.680429324, 55.726245805)):
            Circle(CIRPATTERN2_OUTLINE_R, mode=Mode.SUBTRACT)
    # profile 10 of 11: a face of its own
    with BuildSketch(Plane.XY.offset(CIRPATTERN2_START)):
        with BuildLine():
            ThreePointArc((-33.148105431, 80.329403747), (-44.03802655, 74.915033322), (-54.06541914, 68.033377494))
            ThreePointArc((-54.06541914, 68.033377494), (-53.381517486, 68.448174509), (-52.615652785, 68.678889259))
            ThreePointArc((-52.615652785, 68.678889259), (-28.975555294, 67.517374163), (-7.980380842, 56.590069991))
            ThreePointArc((-7.980380842, 56.590069991), (-4, 57.009845641), (0, 57.15))
            ThreePointArc((0, 57.15), (-14.937119024, 68.207663464), (-32.504965825, 74.27068291))
            ThreePointArc((-32.504965825, 74.27068291), (-35.094259755, 77.059322021), (-33.148105431, 80.329403747))
        make_face()
        with Locations((-24.420129862, 69.15558596)):
            Circle(CIRPATTERN2_OUTLINE_R, mode=Mode.SUBTRACT)
    # profile 11 of 11: a face of its own
    with BuildSketch(Plane.XY.offset(CIRPATTERN2_START)):
        with BuildLine():
            ThreePointArc((8.985215302, 80.572781069), (8.137140536, 84.282460346), (11.457600483, 86.141357031))
            ThreePointArc((11.457600483, 86.141357031), (-0.680533064, 86.897335257), (-12.805337694, 85.951342785))
            ThreePointArc((-12.805337694, 85.951342785), (-12.005662981, 85.968616711), (-11.227047319, 85.785489194))
            ThreePointArc((-11.227047319, 85.785489194), (8.665120108, 72.959538869), (21.383822454, 52.998628635))
            ThreePointArc((21.383822454, 52.998628635), (25.040821205, 51.371974591), (28.575, 49.493351826))
            ThreePointArc((28.575, 49.493351826), (21.167907198, 66.538128805), (8.985215302, 80.572781069))
        make_face()
        with Locations((13.429340156, 72.100559186)):
            Circle(CIRPATTERN2_OUTLINE_R, mode=Mode.SUBTRACT)
    extrude(amount=CIRPATTERN2_DEPTH)


solid = part.part
